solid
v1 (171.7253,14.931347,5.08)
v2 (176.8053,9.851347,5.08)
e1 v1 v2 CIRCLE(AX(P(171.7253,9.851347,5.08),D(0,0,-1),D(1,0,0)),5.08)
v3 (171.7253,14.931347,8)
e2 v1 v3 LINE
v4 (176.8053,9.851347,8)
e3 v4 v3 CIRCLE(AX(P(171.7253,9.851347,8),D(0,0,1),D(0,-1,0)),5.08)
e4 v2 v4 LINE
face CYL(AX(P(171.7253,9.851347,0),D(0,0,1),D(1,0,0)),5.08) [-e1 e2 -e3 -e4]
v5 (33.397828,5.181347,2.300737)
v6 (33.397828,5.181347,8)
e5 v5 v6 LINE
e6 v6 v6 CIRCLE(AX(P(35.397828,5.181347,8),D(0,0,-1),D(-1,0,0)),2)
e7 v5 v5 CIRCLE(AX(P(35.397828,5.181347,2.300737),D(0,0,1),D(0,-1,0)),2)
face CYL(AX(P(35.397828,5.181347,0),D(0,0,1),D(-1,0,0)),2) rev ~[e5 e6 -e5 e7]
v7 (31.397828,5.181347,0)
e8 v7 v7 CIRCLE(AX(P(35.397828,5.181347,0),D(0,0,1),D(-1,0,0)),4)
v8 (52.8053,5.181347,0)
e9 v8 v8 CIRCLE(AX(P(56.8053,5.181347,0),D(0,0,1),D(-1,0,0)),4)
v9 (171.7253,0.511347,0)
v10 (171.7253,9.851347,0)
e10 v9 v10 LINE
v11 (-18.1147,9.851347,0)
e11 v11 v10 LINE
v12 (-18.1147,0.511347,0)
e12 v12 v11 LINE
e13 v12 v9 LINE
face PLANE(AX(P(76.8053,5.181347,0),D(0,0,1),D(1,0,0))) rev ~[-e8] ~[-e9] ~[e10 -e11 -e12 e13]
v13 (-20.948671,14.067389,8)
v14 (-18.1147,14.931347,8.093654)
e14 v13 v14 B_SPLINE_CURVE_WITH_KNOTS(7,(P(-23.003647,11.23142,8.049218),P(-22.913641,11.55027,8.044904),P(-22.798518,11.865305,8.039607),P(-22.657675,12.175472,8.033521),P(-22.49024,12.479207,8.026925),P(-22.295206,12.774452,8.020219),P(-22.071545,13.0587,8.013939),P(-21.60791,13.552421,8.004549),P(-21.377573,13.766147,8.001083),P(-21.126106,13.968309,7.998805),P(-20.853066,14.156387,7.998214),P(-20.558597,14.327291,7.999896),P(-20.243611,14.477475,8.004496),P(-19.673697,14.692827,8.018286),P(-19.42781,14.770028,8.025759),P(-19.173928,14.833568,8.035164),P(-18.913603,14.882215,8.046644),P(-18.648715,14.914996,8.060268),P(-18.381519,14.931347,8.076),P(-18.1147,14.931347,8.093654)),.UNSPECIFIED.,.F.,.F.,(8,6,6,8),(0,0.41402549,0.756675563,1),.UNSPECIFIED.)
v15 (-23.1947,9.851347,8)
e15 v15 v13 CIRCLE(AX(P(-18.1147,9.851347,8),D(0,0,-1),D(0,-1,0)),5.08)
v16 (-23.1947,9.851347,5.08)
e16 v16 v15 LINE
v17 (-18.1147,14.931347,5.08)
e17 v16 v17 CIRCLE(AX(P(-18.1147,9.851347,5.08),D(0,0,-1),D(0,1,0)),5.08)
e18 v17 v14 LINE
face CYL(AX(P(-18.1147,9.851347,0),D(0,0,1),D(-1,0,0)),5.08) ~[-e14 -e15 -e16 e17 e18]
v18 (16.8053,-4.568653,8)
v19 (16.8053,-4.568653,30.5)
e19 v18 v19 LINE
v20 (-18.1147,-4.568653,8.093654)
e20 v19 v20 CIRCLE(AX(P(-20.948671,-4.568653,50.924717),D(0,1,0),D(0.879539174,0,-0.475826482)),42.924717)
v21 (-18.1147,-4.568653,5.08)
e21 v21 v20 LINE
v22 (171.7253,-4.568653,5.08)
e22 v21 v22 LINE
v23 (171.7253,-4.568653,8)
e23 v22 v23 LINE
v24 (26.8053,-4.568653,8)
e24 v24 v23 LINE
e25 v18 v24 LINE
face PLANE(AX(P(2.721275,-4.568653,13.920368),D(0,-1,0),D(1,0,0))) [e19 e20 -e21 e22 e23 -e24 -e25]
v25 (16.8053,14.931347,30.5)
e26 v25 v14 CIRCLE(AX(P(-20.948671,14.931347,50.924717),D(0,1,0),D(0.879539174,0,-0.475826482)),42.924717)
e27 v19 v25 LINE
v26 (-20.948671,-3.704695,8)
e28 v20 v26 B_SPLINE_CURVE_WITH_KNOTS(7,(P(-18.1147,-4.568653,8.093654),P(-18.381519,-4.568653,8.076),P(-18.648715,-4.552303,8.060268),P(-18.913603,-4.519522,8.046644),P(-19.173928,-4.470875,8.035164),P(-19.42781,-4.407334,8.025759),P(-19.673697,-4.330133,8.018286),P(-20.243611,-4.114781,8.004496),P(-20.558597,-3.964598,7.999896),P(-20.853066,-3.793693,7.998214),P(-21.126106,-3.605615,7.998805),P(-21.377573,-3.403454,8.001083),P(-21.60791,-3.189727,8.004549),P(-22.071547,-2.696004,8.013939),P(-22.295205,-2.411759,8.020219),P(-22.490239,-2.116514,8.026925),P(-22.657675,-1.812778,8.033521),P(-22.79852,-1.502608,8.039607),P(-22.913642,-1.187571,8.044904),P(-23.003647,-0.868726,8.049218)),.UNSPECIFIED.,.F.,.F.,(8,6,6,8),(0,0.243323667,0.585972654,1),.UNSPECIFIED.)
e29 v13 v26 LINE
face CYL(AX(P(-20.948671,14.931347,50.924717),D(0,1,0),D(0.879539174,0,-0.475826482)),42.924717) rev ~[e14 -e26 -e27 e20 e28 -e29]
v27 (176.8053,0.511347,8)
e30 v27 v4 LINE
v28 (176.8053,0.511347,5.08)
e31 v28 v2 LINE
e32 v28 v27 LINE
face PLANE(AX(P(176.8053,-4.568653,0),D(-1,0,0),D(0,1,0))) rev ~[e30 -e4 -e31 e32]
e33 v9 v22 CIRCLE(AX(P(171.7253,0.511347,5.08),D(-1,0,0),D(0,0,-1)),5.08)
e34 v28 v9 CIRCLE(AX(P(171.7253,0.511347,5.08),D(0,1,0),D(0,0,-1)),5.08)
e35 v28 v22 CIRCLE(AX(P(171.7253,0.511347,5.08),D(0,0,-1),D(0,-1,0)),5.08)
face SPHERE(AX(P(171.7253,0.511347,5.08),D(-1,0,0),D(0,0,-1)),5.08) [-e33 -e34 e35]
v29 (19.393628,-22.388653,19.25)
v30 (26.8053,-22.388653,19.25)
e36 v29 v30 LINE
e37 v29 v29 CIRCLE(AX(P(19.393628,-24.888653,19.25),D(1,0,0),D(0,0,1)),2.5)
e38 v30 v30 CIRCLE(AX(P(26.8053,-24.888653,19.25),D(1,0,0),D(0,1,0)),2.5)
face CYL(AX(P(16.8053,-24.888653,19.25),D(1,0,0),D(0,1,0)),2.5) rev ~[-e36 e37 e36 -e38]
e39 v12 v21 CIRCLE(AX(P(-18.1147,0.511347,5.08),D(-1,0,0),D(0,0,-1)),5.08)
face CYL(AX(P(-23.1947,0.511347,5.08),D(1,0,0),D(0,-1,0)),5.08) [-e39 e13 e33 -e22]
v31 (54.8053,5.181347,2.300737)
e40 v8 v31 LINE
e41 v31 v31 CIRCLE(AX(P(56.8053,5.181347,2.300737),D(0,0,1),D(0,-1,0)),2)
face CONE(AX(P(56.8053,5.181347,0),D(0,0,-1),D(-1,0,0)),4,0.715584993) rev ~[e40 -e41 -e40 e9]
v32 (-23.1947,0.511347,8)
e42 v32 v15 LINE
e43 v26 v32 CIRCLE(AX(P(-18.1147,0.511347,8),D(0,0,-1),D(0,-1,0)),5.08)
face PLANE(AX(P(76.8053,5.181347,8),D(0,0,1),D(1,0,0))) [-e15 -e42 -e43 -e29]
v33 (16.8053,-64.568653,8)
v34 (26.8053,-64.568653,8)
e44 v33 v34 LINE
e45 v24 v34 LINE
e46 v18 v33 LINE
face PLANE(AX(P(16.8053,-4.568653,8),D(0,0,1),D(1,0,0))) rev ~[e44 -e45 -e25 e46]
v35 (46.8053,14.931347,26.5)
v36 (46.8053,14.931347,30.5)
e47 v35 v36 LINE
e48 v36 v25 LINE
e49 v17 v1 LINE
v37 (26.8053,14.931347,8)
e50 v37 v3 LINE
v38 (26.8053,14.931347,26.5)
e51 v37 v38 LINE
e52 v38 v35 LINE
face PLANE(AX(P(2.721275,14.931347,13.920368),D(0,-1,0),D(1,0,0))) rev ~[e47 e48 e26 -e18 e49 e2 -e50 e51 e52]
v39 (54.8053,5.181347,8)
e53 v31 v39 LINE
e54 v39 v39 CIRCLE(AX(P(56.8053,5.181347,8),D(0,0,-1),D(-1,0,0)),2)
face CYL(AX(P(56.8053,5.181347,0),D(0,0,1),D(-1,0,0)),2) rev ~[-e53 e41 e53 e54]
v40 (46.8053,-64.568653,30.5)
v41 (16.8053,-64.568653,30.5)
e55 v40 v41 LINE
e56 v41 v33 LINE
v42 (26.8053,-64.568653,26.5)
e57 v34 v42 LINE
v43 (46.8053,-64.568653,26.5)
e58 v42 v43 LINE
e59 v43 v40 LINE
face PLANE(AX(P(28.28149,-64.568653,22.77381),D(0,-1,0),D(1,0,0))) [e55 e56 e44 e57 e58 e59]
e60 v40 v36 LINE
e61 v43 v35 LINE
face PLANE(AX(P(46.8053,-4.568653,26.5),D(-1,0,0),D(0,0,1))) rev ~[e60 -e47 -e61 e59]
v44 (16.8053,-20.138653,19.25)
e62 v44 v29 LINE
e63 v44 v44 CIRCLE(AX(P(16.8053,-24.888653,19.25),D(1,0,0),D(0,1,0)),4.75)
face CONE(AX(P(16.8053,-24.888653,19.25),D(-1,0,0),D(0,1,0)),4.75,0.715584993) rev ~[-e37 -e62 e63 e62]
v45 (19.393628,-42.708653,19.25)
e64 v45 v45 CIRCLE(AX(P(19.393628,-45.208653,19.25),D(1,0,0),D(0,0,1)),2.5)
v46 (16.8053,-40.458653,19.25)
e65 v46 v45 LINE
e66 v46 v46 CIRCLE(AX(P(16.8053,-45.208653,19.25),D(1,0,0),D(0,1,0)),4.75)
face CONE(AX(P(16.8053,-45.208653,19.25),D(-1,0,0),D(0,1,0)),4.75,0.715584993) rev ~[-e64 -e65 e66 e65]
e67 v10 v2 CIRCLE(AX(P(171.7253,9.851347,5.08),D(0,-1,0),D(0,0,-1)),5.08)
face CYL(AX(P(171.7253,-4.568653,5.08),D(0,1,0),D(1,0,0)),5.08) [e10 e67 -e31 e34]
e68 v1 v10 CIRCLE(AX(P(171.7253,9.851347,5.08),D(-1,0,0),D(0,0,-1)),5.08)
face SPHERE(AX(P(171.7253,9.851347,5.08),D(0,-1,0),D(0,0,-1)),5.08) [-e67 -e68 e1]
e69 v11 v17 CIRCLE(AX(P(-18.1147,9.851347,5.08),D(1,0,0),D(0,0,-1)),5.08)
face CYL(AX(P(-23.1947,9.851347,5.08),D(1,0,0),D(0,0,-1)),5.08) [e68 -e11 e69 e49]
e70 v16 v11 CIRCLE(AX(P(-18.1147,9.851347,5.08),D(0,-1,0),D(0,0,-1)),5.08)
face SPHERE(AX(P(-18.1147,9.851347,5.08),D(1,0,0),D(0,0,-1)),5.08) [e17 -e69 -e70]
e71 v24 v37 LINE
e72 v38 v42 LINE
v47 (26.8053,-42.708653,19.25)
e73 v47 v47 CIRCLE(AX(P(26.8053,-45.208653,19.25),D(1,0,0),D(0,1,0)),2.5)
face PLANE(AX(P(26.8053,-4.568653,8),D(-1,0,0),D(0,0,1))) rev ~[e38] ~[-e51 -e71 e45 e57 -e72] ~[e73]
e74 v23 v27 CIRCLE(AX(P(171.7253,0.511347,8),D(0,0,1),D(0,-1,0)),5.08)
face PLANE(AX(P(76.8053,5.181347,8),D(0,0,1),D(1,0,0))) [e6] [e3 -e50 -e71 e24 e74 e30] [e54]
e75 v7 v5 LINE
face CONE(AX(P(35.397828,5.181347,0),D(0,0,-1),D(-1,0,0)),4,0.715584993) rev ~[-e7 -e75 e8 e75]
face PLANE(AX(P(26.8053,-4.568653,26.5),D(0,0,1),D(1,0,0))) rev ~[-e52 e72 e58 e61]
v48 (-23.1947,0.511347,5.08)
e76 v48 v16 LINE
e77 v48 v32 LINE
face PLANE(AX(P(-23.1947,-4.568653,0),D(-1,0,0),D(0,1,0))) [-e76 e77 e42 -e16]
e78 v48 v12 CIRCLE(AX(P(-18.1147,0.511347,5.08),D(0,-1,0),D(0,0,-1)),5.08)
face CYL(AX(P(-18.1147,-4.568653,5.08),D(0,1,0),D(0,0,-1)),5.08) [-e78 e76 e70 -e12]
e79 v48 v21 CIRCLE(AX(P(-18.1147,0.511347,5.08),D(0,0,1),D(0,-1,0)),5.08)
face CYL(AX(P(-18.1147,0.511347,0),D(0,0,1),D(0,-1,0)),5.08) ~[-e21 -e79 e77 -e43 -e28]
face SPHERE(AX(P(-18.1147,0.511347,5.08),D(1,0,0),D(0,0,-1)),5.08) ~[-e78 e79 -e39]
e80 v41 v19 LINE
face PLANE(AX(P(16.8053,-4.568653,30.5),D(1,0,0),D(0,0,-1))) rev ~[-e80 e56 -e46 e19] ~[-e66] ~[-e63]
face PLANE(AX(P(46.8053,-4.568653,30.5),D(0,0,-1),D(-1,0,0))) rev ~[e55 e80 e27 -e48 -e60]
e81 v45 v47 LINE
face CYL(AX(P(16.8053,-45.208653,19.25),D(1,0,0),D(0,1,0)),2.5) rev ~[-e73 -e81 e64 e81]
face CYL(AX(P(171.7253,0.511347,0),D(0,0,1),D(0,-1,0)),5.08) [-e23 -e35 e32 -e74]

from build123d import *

# Parameters (mm, degrees)
F0_W            = 200
F0_H            = 19.5
F1_DEPTH        = 8
F2_W            = 10
F2_H            = 19.5
F3_DEPTH        = 22.5
F4_W            = 19.5
F4_H            = 4
F5_DEPTH        = 20
F7_DEPTH        = 60
F9_D            = 4
F9_DEPTH        = 8
F9_CSINK_D      = 8
F9_CSINK_ANGLE  = 82
F9_TIP          = 1.2017212381
F10_T1_DEPTH    = 19.5
F12_D           = 5
F12_DEPTH       = 20
F12_CSINK_D     = 9.5
F12_CSINK_ANGLE = 82
F12_TIP         = 1.5021515476
F13_R           = 5.08


# Not quite as in the source:
# - a fillet or chamfer that OpenCascade refuses, or shapes differently, is made with other operations: its cross-section is extruded or revolved along the edge and cut away or added


with BuildPart() as f1:
    # F0 (on Top) → F1 (new body)
    with BuildSketch(Plane.XY):
        with Locations((76.8052995205, 5.1813468188)):
            Rectangle(F0_W, F0_H)
    extrude(amount=F1_DEPTH)

    # F2 (on face) → F3 (join)
    with BuildSketch(Plane.XY.offset(8)):
        with Locations((21.8052995205, 5.1813468188)):
            Rectangle(F2_W, F2_H)
    extrude(amount=F3_DEPTH)

    # F4 (on face) → F5 (join)
    with BuildSketch(Plane.YZ.offset(26.8052995205)):
        with Locations((5.1813468188, 28.5)):
            Rectangle(F4_W, F4_H)
    extrude(amount=F5_DEPTH)

    # F6 (on face) → F7 (join)
    with BuildSketch(Plane.XZ.offset(4.5686531812)):
        Polygon((16.8052995205, 30.5), (16.8052995205, 8), (26.8052995205, 8), (26.8052995205, 26.5), (46.8052995205, 26.5), (46.8052995205, 30.5), align=None)
    extrude(amount=F7_DEPTH)

    # F9
    with Locations(Plane(origin=(0, 0, 0), x_dir=(1, 0, 0), z_dir=(0, 0, -1))):
        with Locations((35.3978276253, -5.1813468188), (56.8052995205, -5.1813468188)):
            CounterSinkHole(F9_D / 2, F9_CSINK_D / 2, depth=F9_DEPTH, counter_sink_angle=F9_CSINK_ANGLE)
            with Locations((0, 0, -(F9_DEPTH + F9_TIP / 2))):  # 118° drill point
                Cone(0, F9_D / 2, F9_TIP, mode=Mode.SUBTRACT)

    # F10: fillet of radius 42.924717139 on 1 edges, made by hand

    # F10_s2 → F10_t1 (join)
    with BuildSketch(Plane.XZ.offset(-14.9313468188)):
        with BuildLine():
            ThreePointArc((16.8052995205, 30.5), (1.0263848307, 14.0515795772), (-20.9486707509, 8))
            Line((-20.9486707509, 8), (16.8052995205, 8))
            Line((16.8052995205, 8), (16.8052995205, 30.5))
        make_face()
    extrude(amount=F10_T1_DEPTH)

    # F12
    with Locations(Plane(origin=(16.8052995205, 0, 0), x_dir=(0, -1, 0), z_dir=(-1, 0, 0))):
        with Locations((24.8886531812, 19.25), (45.2086531812, 19.25)):
            CounterSinkHole(F12_D / 2, F12_CSINK_D / 2, depth=F12_DEPTH, counter_sink_angle=F12_CSINK_ANGLE)
            with Locations((0, 0, -(F12_DEPTH + F12_TIP / 2))):  # 118° drill point
                Cone(0, F12_D / 2, F12_TIP, mode=Mode.SUBTRACT)

    # F13
    f13_edges = [f1.edges().sort_by_distance(p)[0] for p in [
        (76.8053, -4.568653, 0),
        (176.8053, 5.181347, 0),
        (76.8053, 14.931347, 0),
        (-23.1947, 5.181347, 0),
        (176.8053, 14.931347, 4),
        (176.8053, -4.568653, 4),
        (-23.1947, 14.931347, 4),
        (-23.1947, -4.568653, 4),
    ]]
    fillet(f13_edges, radius=F13_R)


solid = f1.part
